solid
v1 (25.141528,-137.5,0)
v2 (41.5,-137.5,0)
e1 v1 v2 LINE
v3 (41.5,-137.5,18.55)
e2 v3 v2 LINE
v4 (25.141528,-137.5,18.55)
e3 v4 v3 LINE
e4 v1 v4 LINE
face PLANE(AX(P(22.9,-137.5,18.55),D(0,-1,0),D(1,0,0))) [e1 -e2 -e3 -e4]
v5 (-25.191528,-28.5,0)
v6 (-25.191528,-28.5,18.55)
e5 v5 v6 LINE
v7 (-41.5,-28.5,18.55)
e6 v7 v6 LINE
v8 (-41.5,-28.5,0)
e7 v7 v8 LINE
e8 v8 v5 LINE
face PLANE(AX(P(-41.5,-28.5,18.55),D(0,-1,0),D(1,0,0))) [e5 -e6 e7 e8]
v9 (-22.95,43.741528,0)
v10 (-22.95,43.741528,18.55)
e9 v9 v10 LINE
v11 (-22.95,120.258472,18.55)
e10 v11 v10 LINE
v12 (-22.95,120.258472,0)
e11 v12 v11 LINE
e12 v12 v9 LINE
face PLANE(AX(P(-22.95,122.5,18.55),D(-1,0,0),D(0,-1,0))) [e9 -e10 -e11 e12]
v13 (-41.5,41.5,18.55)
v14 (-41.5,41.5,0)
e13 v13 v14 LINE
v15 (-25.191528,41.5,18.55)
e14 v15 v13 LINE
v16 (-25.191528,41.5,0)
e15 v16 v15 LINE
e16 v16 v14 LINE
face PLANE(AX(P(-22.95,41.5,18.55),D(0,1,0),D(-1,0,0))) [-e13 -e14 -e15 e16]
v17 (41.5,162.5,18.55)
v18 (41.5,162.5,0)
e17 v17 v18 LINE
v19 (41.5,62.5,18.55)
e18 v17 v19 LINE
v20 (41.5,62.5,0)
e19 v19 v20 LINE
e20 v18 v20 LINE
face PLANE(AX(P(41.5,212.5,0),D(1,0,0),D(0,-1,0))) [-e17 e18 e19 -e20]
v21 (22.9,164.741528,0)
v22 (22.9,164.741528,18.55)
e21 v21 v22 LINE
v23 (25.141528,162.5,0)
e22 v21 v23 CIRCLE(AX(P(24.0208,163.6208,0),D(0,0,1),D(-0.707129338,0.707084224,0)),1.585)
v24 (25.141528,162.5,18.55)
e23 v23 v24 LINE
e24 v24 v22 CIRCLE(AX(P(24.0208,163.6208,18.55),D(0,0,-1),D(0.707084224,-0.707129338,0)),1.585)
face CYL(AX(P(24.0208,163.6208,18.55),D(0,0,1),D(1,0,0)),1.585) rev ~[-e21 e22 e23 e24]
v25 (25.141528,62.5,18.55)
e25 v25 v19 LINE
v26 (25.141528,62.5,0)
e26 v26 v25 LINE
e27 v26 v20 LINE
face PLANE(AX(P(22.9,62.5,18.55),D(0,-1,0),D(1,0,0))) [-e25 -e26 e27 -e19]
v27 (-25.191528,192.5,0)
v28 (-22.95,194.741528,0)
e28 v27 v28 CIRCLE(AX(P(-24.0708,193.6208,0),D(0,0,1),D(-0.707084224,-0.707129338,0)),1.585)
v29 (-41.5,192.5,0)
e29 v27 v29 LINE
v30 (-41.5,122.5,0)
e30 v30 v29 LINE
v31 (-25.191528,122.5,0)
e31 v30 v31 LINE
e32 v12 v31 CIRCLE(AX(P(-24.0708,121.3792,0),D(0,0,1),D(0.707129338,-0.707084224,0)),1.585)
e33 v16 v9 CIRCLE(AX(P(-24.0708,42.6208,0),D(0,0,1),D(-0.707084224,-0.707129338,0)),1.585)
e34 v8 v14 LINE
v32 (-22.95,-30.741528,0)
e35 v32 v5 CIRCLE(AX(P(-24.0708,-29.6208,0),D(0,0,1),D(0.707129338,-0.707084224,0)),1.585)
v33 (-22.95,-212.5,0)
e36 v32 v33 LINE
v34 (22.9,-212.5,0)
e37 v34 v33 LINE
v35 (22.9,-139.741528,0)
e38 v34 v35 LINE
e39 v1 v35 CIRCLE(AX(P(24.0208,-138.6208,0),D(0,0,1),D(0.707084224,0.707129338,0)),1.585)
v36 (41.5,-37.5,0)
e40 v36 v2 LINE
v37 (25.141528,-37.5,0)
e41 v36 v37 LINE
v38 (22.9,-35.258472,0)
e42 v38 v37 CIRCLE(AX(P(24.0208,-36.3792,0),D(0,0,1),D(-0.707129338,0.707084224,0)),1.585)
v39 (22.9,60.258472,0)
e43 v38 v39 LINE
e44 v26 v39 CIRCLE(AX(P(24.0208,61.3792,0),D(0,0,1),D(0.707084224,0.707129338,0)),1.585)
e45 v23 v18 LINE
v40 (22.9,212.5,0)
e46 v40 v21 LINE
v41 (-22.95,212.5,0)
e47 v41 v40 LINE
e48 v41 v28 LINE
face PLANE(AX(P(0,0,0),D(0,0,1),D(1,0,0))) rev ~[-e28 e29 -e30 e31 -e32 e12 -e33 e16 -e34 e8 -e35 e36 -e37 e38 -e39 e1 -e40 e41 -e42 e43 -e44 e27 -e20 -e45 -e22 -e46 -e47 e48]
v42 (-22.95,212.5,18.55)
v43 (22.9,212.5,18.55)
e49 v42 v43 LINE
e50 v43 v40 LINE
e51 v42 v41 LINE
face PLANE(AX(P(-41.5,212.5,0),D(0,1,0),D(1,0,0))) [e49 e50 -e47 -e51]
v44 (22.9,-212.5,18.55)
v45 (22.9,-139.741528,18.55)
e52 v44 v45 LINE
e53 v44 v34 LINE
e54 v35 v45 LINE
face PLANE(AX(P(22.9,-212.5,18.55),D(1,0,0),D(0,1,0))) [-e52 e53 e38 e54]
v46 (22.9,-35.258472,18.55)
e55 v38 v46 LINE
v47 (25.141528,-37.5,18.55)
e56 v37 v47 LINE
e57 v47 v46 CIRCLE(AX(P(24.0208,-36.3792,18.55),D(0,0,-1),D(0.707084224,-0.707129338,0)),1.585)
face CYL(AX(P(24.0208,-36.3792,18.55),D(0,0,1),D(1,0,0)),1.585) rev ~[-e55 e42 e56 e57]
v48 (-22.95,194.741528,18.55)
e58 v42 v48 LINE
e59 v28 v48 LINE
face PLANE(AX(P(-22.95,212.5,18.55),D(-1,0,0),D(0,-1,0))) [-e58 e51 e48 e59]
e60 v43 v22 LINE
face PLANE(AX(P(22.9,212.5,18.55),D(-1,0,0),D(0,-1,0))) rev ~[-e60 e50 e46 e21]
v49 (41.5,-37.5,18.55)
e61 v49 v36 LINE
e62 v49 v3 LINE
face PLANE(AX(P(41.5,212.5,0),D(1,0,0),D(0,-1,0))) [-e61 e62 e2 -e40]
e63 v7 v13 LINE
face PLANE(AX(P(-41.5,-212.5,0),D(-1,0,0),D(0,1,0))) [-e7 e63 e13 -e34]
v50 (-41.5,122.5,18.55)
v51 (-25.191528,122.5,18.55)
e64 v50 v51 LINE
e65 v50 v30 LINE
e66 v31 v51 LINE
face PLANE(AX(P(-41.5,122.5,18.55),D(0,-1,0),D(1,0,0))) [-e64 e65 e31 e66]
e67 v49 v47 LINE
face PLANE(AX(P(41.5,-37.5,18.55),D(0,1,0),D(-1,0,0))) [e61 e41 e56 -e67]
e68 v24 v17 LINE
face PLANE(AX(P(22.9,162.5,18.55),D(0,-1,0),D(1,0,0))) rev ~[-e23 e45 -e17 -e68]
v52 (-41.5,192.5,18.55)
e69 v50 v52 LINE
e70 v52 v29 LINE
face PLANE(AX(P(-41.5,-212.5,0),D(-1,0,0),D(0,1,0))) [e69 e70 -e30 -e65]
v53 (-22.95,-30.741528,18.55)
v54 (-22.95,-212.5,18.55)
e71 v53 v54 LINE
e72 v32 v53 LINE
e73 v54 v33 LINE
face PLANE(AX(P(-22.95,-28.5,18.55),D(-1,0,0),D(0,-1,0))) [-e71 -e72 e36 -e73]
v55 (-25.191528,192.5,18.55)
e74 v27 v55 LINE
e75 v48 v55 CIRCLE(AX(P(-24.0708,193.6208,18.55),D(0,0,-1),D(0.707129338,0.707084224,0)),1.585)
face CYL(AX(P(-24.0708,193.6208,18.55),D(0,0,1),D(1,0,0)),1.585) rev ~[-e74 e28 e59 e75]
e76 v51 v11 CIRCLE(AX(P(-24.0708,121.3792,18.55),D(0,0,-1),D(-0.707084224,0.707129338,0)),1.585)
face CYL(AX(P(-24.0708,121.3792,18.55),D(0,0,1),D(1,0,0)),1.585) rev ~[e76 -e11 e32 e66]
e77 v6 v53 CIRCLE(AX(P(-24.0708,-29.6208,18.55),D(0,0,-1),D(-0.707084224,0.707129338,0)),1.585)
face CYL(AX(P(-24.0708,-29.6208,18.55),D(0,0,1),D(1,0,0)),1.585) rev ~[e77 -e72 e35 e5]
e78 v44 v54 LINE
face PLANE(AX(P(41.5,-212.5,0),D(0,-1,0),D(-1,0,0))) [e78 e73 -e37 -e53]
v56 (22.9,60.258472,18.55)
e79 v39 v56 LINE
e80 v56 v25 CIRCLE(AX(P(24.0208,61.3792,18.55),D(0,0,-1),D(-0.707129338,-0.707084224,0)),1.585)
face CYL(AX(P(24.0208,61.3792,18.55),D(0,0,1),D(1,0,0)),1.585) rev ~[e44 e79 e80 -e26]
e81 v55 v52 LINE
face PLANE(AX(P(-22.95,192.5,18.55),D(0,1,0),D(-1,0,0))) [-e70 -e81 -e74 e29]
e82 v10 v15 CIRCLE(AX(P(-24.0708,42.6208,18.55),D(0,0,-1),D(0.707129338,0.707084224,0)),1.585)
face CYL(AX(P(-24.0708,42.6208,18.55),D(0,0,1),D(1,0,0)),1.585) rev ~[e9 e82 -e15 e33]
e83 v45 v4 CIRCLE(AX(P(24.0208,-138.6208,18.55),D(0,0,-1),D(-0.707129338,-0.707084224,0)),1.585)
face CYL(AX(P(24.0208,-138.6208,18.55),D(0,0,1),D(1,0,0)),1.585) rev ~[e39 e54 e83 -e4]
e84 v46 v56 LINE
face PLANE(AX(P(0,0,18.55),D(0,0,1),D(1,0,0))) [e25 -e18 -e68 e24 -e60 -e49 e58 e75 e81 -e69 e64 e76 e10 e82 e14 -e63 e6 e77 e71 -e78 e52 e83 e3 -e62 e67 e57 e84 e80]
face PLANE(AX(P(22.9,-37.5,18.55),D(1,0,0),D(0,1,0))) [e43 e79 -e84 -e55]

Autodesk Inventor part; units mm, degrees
ref_plane "YZ Plane" through (0, 0, 0) normal (1, 0, 0) x (0, 1, 0)
ref_plane "XZ Plane" through (0, 0, 0) normal (0, 1, 0) x (-1, 0, 0)
ref_plane "XY Plane" through (0, 0, 0) normal (0, 0, 1) x (1, 0, 0)
sketch "Esquisse3" plane through (0, 0, 0) normal (0, 0, 1) x (1, 0, 0)
  line L0 (41.5, -212.5) -> (-41.5, -212.5)
  line L1 (-41.5, -212.5) -> (-41.5, 212.5)
  line L2 (-41.5, 212.5) -> (41.5, 212.5)
  line L3 (41.5, 212.5) -> (41.5, -212.5)
  line L4 (41.5, -212.5) -> (-41.5, 212.5) construction
  line L5 (-41.5, -212.5) -> (41.5, 212.5) construction
  point P0 (0, 0)
  dimension "d20" = 83
  dimension "d21" = 425
extrude "Extrusion3" add sketch "Esquisse3" along normal blind 18.55
sketch "Esquisse4" plane through (0, 0, 18.55) normal (0, 0, 1) x (1, 0, 0)
  line L0 (41.5, 212.5) -> (22.9, 212.5)
  line L1 (22.9, 212.5) -> (22.9, 162.5)
  line L2 (22.9, 162.5) -> (41.5, 162.5)
  line L3 (41.5, 162.5) -> (41.5, 212.5)
  line L4 (-41.5, -212.5) -> (41.5, -212.5) projected
  line L5 (41.5, -212.5) -> (22.9, -212.5)
  line L6 (22.9, -212.5) -> (22.9, -137.5)
  line L7 (22.9, -137.5) -> (41.5, -137.5)
  line L8 (41.5, -137.5) -> (41.5, -212.5)
  line L9 (41.5, -37.5) -> (22.9, -37.5)
  line L10 (22.9, -37.5) -> (22.9, 62.5)
  line L11 (22.9, 62.5) -> (41.5, 62.5)
  line L12 (41.5, 62.5) -> (41.5, -37.5)
  point P0 (0, 0)
  dimension "d24" = 75
  dimension "d25" = 50
  dimension "d27" = 100
  dimension "d29" = 100
  dimension "d30" = 100
  dimension "d31" = 18.6
extrude "Extrusion4" cut sketch "Esquisse4" against normal blind 18.55
sketch "Esquisse5" plane through (0, 0, 18.55) normal (0, 0, 1) x (1, 0, 0)
  line L0 (22.9, 212.5) -> (-41.5, 212.5) projected
  line L1 (-41.5, 212.5) -> (-22.95, 212.5)
  line L2 (-22.95, 212.5) -> (-22.95, 192.5)
  line L3 (-22.95, 192.5) -> (-41.5, 192.5)
  line L4 (-41.5, 192.5) -> (-41.5, 212.5)
  line L5 (-41.5, 212.5) -> (-41.5, -212.5) projected
  line L6 (-41.5, 122.5) -> (-22.95, 122.5)
  line L7 (-22.95, 122.5) -> (-22.95, 41.5)
  line L8 (-22.95, 41.5) -> (-41.5, 41.5)
  line L9 (-41.5, 41.5) -> (-41.5, 122.5)
  line L10 (-41.5, -28.5) -> (-22.95, -28.5)
  line L11 (-22.95, -28.5) -> (-22.95, -212.5)
  line L12 (-22.95, -212.5) -> (-41.5, -212.5)
  line L13 (-41.5, -212.5) -> (-41.5, -28.5)
  line L14 (-41.5, -212.5) -> (22.9, -212.5) projected
  point P0 (0, 0)
  point P1 (-41.5, 41.5)
  dimension "d34" = 20
  dimension "d35" = 18.55
  dimension "d37" = 70
  dimension "d38" = 81
  dimension "d39" = 70
extrude "Extrusion5" cut sketch "Esquisse5" against normal blind 18.55
sketch "Esquisse6" plane through (0, 0, 18.55) normal (0, 0, 1) x (1, 0, 0)
  circle A0 centre (-24.0708, 193.6208) radius 1.585
  circle A1 centre (24.0208, 163.6208) radius 1.585
  circle A2 centre (-24.0708, 121.3792) radius 1.585
  circle A3 centre (24.0208, 61.3792) radius 1.585
  circle A4 centre (-24.0708, 42.6208) radius 1.585
  circle A5 centre (24.0208, -36.3792) radius 1.585
  circle A6 centre (-24.0708, -29.6208) radius 1.585
  circle A7 centre (24.0208, -138.6208) radius 1.585
  line L0 (-41.5, 192.5) -> (-22.95, 192.5) projected
  line L1 (-24.0708, 193.6208) -> (-22.95, 192.5) construction
  line L2 (41.5, 162.5) -> (22.9, 162.5) projected
  line L3 (22.9, 162.5) -> (24.0208, 163.6208) construction
  line L4 (-22.95, 122.5) -> (-41.5, 122.5) projected
  line L5 (-22.95, 122.5) -> (-24.0708, 121.3792) construction
  line L6 (-24.0708, 42.6208) -> (-22.95, 41.5) construction
  line L7 (-41.5, 41.5) -> (-22.95, 41.5) projected
  line L8 (22.9, 62.5) -> (24.0208, 61.3792) construction
  line L9 (-22.95, -28.5) -> (-41.5, -28.5) projected
  line L10 (-22.95, -28.5) -> (-24.0708, -29.6208) construction
  line L11 (-22.95, -28.5) -> (-22.95, -212.5) projected
  line L12 (41.5, -37.5) -> (22.9, -37.5) projected
  line L13 (22.9, -37.5) -> (24.0208, -36.3792) construction
  line L14 (22.9, -37.5) -> (22.9, 62.5) projected
  line L15 (22.9, -137.5) -> (41.5, -137.5) projected
  line L16 (22.9, -137.5) -> (24.0208, -138.6208) construction
  point P0 (0, 0)
  dimension "d43" = 3.17
  dimension "d46" = 45
  dimension "d47" = 45
  dimension "d49" = 45
  dimension "d51" = 45
  dimension "d52" = 45
  dimension "d53" = 45
  dimension "d54" = 45
extrude "Extrusion6" cut sketch "Esquisse6" against normal blind 18.55
properties part number "cover"
